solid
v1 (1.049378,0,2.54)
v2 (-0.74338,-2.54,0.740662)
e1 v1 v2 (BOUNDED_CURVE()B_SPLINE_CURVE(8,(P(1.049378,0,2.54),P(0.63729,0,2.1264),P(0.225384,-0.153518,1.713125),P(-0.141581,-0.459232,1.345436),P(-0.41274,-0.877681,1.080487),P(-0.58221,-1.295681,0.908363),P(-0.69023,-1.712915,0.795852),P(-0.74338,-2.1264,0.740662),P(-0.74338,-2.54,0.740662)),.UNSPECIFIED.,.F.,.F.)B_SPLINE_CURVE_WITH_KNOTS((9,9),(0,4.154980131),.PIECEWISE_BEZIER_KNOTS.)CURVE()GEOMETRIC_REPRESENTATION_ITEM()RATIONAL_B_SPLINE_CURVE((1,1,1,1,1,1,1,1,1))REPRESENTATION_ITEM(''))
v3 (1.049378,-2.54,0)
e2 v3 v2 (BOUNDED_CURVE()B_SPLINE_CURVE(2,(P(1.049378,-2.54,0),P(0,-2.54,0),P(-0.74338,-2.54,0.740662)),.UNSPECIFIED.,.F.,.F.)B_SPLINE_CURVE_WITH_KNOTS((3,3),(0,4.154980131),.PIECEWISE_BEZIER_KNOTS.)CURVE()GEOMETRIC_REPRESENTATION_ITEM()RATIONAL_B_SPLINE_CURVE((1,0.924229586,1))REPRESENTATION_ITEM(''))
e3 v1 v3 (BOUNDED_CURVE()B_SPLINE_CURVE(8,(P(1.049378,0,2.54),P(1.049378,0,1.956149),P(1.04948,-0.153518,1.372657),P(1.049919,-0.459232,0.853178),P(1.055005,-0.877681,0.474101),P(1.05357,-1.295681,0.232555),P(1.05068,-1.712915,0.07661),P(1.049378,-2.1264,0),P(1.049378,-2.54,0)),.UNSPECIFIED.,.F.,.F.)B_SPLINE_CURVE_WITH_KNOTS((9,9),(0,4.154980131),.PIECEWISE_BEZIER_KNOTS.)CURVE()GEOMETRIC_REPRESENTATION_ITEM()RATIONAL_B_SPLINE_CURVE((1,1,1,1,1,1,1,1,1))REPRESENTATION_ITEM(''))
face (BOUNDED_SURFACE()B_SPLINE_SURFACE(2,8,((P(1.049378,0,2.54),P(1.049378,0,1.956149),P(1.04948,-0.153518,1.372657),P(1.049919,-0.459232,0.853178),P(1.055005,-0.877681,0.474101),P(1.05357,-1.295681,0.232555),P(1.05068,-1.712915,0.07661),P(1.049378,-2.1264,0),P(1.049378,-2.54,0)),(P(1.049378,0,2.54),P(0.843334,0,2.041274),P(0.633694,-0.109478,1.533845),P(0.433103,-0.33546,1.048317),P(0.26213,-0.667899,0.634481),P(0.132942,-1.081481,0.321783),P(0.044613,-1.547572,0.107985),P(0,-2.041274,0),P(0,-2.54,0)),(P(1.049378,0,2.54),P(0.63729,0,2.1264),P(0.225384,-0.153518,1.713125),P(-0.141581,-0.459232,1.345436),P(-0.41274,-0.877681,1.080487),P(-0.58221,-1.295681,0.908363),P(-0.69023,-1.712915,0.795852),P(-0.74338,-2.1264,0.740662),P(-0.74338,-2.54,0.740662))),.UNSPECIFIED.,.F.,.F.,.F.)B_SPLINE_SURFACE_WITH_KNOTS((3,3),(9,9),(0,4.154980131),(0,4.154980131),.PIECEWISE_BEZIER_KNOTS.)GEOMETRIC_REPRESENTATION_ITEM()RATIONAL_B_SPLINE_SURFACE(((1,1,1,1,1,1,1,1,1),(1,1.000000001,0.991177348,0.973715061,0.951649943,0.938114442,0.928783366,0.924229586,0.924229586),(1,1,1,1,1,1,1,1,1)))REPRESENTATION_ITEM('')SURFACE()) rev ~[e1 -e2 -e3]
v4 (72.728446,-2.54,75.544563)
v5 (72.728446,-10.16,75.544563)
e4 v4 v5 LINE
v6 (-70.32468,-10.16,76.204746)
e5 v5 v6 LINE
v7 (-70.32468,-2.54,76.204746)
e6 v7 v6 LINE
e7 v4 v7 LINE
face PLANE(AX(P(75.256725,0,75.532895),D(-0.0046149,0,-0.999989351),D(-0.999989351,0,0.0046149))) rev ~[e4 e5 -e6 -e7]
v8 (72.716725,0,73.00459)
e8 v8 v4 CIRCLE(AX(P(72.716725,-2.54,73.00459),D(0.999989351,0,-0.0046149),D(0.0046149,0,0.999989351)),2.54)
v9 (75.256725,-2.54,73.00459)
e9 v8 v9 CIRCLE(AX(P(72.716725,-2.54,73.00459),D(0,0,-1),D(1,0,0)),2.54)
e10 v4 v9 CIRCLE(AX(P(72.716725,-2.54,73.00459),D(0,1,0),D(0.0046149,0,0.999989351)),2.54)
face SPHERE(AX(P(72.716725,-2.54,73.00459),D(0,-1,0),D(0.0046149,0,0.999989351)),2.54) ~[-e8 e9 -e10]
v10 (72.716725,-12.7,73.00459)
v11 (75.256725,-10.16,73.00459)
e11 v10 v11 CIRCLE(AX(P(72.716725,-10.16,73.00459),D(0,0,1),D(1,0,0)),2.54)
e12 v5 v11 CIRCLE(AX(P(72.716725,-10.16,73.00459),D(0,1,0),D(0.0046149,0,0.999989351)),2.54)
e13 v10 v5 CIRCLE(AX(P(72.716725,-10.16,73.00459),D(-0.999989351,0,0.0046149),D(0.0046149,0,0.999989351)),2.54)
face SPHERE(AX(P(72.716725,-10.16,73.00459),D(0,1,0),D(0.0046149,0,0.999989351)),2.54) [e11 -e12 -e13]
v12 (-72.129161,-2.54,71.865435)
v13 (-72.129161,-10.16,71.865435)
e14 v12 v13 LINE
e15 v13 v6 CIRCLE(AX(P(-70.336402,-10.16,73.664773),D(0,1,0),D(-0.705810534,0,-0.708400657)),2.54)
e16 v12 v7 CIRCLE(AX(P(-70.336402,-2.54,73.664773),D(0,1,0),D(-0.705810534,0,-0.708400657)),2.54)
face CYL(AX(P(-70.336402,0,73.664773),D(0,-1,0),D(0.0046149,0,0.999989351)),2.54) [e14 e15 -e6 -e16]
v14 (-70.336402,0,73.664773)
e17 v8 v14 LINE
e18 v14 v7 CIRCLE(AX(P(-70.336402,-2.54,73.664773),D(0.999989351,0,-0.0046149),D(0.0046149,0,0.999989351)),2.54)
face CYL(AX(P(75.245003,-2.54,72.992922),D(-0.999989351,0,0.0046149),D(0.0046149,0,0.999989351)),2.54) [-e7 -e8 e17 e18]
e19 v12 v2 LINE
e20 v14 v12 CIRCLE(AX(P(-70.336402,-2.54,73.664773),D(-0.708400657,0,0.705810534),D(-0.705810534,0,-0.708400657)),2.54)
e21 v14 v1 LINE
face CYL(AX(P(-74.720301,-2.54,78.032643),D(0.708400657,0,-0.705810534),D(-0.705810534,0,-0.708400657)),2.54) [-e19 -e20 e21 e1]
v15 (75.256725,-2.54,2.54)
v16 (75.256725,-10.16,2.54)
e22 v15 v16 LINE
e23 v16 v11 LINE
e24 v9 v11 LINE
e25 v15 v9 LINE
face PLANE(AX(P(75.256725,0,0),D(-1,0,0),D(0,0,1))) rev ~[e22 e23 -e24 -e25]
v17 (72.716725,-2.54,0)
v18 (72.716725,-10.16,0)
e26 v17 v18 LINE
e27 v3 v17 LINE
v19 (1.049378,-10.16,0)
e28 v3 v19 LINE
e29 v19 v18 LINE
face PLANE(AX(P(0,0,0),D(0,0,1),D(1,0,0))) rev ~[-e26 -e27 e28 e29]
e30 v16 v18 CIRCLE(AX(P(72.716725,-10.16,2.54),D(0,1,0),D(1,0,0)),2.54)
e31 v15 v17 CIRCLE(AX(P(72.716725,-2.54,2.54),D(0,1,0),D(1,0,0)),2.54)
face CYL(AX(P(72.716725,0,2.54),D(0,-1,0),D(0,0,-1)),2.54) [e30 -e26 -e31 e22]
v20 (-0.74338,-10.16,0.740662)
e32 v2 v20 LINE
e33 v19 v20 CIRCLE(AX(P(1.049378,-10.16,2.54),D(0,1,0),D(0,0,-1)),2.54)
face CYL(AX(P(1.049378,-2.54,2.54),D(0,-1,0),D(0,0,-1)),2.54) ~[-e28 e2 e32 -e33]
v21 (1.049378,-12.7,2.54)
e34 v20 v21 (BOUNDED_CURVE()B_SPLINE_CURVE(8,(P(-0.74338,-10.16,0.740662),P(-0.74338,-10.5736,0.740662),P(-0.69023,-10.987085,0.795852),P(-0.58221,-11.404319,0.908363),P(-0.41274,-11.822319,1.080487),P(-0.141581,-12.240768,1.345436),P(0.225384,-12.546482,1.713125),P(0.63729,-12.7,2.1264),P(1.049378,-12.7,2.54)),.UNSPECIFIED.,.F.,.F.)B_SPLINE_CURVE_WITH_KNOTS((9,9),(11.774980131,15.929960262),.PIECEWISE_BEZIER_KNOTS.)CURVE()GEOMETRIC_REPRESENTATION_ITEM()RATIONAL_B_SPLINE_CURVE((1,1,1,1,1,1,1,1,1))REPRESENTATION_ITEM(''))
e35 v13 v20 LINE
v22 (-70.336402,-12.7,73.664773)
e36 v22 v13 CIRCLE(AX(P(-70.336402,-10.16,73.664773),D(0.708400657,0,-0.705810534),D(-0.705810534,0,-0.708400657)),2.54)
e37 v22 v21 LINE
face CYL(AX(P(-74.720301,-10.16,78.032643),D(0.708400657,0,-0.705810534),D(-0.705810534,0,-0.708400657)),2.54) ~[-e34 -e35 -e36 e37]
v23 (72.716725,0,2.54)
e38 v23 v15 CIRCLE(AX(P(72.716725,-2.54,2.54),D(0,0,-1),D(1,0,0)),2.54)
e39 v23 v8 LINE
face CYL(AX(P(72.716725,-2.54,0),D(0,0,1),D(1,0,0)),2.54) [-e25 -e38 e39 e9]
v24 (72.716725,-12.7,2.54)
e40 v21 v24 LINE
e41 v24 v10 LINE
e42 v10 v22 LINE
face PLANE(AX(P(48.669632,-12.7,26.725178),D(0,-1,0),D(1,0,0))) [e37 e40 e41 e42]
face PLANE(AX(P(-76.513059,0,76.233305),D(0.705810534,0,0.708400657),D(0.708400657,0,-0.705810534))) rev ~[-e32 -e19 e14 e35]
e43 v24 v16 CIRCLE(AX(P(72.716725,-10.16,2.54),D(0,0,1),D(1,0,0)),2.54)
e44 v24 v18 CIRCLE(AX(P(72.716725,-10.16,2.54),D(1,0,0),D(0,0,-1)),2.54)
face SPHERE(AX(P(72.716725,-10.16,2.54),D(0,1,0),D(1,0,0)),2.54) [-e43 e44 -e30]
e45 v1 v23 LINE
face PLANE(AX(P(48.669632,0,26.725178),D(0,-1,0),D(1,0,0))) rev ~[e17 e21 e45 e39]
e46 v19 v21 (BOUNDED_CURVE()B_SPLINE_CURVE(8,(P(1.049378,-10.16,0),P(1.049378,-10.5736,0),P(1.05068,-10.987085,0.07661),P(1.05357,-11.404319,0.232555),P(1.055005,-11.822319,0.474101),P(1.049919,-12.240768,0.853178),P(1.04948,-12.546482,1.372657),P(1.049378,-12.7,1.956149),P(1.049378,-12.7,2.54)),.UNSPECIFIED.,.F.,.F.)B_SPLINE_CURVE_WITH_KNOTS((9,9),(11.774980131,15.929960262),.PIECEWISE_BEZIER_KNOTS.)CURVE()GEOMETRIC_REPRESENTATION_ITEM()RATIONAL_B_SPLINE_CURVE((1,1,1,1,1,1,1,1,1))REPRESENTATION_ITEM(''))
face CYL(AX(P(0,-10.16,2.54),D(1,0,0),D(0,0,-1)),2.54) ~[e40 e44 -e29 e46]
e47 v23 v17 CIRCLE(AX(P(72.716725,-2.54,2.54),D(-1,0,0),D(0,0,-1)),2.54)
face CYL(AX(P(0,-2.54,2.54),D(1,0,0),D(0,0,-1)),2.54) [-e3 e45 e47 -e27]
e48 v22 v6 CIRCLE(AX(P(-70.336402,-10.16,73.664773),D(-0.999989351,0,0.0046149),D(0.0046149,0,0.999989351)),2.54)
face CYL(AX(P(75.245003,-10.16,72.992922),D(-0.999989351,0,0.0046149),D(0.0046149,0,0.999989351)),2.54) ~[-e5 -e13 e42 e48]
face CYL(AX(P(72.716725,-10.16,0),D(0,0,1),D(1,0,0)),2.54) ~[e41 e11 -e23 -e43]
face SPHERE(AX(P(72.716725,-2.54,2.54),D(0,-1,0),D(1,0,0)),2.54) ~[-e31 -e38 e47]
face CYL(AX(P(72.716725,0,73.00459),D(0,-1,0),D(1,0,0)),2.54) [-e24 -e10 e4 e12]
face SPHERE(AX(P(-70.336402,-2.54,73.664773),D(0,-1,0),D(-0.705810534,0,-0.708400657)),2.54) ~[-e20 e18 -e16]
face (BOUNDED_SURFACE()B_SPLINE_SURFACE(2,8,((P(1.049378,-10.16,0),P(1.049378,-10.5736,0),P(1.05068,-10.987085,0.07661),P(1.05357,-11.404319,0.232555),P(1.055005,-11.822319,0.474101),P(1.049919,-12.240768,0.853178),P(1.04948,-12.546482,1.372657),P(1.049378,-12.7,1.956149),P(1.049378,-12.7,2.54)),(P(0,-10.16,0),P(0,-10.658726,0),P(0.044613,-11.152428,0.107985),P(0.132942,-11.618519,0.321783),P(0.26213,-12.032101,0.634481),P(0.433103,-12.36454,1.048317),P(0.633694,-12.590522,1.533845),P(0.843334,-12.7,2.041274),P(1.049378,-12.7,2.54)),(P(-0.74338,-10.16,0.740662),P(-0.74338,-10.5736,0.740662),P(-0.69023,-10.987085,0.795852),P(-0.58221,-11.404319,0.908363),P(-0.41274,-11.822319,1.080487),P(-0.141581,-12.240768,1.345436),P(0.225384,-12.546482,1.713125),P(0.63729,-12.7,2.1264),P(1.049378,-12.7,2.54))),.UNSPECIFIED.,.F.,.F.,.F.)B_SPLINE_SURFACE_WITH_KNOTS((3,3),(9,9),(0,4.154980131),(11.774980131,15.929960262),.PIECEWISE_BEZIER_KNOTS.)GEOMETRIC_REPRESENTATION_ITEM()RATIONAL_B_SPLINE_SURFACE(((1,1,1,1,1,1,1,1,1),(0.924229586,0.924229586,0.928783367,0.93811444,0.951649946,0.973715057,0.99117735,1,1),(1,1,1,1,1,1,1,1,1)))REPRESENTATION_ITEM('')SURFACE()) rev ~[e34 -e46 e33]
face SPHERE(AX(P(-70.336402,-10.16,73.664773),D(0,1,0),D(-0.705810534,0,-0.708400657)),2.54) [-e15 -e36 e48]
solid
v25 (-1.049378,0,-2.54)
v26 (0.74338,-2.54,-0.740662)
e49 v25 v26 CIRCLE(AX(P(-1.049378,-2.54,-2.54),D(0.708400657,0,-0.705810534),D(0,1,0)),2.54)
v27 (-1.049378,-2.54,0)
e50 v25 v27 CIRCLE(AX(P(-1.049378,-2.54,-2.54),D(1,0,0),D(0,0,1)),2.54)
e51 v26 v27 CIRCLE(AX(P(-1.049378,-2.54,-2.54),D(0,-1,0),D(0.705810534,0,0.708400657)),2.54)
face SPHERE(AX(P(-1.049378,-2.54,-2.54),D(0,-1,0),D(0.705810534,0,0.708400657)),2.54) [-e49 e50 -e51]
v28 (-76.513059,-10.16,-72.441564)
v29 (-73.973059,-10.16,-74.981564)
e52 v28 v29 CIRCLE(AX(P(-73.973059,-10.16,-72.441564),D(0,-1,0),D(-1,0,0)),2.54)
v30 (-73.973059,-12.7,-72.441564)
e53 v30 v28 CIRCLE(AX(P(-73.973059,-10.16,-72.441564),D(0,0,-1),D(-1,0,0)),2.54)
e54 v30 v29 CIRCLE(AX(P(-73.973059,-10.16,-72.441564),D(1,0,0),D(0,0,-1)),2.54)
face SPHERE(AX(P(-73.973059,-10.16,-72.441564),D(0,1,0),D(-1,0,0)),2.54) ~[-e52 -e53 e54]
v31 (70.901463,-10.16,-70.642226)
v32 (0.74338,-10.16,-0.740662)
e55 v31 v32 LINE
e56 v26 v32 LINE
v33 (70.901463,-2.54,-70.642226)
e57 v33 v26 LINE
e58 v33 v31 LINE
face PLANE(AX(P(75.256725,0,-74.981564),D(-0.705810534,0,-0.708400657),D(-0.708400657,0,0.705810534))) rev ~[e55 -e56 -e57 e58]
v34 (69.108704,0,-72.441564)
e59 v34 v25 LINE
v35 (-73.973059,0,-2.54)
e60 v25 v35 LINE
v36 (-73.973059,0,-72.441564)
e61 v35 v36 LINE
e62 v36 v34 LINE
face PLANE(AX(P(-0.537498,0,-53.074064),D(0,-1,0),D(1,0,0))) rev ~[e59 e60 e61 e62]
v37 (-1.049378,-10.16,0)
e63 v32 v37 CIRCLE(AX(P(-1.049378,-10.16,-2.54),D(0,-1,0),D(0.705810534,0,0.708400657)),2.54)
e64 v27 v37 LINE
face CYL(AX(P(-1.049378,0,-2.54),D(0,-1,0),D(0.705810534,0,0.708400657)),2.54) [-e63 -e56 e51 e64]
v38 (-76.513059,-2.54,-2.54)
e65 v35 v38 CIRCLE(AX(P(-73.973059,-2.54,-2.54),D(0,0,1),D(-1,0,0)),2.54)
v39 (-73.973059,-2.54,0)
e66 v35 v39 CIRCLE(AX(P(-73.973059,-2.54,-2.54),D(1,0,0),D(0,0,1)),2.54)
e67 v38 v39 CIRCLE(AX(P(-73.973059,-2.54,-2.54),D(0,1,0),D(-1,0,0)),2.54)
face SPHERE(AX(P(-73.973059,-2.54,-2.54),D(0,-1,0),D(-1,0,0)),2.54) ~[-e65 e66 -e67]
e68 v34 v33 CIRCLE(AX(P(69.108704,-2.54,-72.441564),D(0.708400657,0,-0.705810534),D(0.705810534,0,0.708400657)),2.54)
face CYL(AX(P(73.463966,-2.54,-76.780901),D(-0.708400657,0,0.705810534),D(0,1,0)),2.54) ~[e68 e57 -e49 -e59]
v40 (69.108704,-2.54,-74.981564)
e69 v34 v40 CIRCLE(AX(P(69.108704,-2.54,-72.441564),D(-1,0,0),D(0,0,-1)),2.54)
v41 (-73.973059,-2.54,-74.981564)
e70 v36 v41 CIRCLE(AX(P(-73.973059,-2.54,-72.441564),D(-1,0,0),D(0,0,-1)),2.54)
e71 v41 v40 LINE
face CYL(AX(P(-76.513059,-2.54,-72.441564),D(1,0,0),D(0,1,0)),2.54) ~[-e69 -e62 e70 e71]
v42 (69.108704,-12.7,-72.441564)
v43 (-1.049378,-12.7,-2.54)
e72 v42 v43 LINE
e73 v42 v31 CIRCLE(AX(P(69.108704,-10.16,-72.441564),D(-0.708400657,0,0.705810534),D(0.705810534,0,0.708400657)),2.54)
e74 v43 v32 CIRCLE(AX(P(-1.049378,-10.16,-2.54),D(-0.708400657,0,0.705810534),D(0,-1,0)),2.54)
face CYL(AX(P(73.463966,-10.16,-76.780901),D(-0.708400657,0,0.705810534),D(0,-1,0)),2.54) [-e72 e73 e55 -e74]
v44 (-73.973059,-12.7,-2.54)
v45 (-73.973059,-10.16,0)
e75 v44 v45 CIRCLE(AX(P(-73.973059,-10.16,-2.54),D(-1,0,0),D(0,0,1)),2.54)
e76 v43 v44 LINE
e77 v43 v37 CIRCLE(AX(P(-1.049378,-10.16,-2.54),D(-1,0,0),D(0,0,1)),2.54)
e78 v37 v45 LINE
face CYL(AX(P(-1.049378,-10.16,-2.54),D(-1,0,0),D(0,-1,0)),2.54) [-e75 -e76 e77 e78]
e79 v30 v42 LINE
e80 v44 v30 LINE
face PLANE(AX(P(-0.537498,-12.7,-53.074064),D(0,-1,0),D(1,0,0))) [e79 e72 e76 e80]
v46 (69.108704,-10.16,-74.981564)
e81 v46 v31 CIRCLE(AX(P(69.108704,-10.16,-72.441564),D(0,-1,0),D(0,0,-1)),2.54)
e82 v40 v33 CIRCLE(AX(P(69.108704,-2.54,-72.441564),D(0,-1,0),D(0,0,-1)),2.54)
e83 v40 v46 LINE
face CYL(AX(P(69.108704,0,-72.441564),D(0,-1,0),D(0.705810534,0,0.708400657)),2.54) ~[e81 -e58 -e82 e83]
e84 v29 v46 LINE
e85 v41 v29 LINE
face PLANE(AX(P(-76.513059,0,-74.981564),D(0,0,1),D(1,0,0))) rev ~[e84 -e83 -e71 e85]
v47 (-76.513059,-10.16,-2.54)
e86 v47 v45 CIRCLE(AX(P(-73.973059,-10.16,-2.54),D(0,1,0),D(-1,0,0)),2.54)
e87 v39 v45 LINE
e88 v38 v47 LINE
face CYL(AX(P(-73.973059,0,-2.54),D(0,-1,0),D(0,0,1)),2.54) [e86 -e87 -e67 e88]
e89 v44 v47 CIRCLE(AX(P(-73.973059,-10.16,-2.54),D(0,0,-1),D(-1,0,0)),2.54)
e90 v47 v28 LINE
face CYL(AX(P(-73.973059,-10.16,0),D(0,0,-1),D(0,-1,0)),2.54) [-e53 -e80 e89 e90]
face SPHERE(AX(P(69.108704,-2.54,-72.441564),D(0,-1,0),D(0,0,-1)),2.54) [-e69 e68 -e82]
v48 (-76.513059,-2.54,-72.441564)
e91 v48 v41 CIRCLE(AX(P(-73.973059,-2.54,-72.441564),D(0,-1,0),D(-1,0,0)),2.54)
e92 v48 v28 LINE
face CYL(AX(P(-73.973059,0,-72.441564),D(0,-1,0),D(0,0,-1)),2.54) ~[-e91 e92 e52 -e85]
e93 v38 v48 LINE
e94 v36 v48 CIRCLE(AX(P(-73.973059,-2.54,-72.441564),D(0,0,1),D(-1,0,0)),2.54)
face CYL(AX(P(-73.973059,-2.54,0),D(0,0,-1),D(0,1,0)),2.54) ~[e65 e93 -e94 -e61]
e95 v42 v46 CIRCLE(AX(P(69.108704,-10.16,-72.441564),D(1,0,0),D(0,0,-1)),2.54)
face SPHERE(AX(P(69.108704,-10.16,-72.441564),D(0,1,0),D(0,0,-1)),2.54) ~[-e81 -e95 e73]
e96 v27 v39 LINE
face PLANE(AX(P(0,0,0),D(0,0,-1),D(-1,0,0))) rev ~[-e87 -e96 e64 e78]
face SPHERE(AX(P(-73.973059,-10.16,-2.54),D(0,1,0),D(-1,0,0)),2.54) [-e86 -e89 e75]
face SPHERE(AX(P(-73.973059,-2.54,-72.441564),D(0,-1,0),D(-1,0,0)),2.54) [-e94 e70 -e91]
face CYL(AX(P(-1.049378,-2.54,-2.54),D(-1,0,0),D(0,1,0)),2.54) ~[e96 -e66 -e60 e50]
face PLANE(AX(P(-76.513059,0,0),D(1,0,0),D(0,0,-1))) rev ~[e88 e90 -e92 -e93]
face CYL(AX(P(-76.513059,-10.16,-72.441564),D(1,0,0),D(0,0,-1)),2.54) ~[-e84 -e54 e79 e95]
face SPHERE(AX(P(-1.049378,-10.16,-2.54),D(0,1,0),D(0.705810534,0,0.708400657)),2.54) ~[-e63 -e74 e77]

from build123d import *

# Parameters (mm, degrees)
F1_DEPTH = 12.7
F2_R     = 2.54
F2_2_R   = 2.54
F3_R     = 2.54
F3_2_R   = 2.54


with BuildPart() as f1:
    # F0 (on Front) → F1 (new body)
    with BuildSketch(Plane.XZ):
        Polygon((75.2567246384, -74.9815637702), (0, 0), (-76.5130594373, -74.9815637702), align=None)
        Polygon((-76.5130594373, -74.9815637702), (0, 0), (-76.5130594373, 0), align=None)
    extrude(amount=F1_DEPTH)

    # F2
    f2_edges = [f1.edges().sort_by_distance(p)[0] for p in [
        (0, -6.35, 0),
    ]]
    fillet(f2_edges, radius=F2_R)

    # F3
    f3_edges = [f1.edges().sort_by_distance(p)[0] for p in [
        (-76.513059, -6.35, 0),
        (-76.513059, -6.35, -74.981564),
        (-76.513059, 0, -37.490782),
        (-76.513059, -12.7, -37.490782),
        (-38.781219, 0, 0),
        (-1.049378, -6.35, 0),
        (-38.781219, -12.7, 0),
        (75.256725, -6.35, -74.981564),
        (-0.628167, 0, -74.981564),
        (-0.628167, -12.7, -74.981564),
        (38.000052, 0, -37.861113),
        (0.74338, -6.35, -0.740662),
        (38.000052, -12.7, -37.861113),
        (-0.079512, 0, -0.192457),
        (-0.079512, -12.7, -0.192457),
    ]]
    fillet(f3_edges, radius=F3_R)


with BuildPart() as f1b:
    # F0 (on Front) → F1, piece 2 (new body)
    with BuildSketch(Plane.XZ):
        Polygon((75.2567246384, 75.5328952683), (0, 0), (75.2567246384, 0), align=None)
        Polygon((75.2567246384, 75.5328952683), (-76.5130594373, 76.233305037), (0, 0), align=None)
    extrude(amount=F1_DEPTH)

    # F2#2
    f2_2_edges = [f1b.edges().sort_by_distance(p)[0] for p in [
        (-76.513059, -6.35, 76.233305),
        (-38.25653, 0, 38.116653),
        (-38.25653, -12.7, 38.116653),
        (75.256725, -6.35, 75.532895),
        (-0.628167, 0, 75.8831),
        (-0.628167, -12.7, 75.8831),
        (75.256725, -6.35, 0),
        (75.256725, 0, 37.766448),
        (75.256725, -12.7, 37.766448),
        (37.628362, 0, 0),
        (37.628362, -12.7, 0),
    ]]
    fillet(f2_2_edges, radius=F2_2_R)

    # F3#2
    f3_2_edges = [f1b.edges().sort_by_distance(p)[0] for p in [
        (0, -6.35, 0),
    ]]
    fillet(f3_2_edges, radius=F3_2_R)


solid = Compound([f1.part, f1b.part])
